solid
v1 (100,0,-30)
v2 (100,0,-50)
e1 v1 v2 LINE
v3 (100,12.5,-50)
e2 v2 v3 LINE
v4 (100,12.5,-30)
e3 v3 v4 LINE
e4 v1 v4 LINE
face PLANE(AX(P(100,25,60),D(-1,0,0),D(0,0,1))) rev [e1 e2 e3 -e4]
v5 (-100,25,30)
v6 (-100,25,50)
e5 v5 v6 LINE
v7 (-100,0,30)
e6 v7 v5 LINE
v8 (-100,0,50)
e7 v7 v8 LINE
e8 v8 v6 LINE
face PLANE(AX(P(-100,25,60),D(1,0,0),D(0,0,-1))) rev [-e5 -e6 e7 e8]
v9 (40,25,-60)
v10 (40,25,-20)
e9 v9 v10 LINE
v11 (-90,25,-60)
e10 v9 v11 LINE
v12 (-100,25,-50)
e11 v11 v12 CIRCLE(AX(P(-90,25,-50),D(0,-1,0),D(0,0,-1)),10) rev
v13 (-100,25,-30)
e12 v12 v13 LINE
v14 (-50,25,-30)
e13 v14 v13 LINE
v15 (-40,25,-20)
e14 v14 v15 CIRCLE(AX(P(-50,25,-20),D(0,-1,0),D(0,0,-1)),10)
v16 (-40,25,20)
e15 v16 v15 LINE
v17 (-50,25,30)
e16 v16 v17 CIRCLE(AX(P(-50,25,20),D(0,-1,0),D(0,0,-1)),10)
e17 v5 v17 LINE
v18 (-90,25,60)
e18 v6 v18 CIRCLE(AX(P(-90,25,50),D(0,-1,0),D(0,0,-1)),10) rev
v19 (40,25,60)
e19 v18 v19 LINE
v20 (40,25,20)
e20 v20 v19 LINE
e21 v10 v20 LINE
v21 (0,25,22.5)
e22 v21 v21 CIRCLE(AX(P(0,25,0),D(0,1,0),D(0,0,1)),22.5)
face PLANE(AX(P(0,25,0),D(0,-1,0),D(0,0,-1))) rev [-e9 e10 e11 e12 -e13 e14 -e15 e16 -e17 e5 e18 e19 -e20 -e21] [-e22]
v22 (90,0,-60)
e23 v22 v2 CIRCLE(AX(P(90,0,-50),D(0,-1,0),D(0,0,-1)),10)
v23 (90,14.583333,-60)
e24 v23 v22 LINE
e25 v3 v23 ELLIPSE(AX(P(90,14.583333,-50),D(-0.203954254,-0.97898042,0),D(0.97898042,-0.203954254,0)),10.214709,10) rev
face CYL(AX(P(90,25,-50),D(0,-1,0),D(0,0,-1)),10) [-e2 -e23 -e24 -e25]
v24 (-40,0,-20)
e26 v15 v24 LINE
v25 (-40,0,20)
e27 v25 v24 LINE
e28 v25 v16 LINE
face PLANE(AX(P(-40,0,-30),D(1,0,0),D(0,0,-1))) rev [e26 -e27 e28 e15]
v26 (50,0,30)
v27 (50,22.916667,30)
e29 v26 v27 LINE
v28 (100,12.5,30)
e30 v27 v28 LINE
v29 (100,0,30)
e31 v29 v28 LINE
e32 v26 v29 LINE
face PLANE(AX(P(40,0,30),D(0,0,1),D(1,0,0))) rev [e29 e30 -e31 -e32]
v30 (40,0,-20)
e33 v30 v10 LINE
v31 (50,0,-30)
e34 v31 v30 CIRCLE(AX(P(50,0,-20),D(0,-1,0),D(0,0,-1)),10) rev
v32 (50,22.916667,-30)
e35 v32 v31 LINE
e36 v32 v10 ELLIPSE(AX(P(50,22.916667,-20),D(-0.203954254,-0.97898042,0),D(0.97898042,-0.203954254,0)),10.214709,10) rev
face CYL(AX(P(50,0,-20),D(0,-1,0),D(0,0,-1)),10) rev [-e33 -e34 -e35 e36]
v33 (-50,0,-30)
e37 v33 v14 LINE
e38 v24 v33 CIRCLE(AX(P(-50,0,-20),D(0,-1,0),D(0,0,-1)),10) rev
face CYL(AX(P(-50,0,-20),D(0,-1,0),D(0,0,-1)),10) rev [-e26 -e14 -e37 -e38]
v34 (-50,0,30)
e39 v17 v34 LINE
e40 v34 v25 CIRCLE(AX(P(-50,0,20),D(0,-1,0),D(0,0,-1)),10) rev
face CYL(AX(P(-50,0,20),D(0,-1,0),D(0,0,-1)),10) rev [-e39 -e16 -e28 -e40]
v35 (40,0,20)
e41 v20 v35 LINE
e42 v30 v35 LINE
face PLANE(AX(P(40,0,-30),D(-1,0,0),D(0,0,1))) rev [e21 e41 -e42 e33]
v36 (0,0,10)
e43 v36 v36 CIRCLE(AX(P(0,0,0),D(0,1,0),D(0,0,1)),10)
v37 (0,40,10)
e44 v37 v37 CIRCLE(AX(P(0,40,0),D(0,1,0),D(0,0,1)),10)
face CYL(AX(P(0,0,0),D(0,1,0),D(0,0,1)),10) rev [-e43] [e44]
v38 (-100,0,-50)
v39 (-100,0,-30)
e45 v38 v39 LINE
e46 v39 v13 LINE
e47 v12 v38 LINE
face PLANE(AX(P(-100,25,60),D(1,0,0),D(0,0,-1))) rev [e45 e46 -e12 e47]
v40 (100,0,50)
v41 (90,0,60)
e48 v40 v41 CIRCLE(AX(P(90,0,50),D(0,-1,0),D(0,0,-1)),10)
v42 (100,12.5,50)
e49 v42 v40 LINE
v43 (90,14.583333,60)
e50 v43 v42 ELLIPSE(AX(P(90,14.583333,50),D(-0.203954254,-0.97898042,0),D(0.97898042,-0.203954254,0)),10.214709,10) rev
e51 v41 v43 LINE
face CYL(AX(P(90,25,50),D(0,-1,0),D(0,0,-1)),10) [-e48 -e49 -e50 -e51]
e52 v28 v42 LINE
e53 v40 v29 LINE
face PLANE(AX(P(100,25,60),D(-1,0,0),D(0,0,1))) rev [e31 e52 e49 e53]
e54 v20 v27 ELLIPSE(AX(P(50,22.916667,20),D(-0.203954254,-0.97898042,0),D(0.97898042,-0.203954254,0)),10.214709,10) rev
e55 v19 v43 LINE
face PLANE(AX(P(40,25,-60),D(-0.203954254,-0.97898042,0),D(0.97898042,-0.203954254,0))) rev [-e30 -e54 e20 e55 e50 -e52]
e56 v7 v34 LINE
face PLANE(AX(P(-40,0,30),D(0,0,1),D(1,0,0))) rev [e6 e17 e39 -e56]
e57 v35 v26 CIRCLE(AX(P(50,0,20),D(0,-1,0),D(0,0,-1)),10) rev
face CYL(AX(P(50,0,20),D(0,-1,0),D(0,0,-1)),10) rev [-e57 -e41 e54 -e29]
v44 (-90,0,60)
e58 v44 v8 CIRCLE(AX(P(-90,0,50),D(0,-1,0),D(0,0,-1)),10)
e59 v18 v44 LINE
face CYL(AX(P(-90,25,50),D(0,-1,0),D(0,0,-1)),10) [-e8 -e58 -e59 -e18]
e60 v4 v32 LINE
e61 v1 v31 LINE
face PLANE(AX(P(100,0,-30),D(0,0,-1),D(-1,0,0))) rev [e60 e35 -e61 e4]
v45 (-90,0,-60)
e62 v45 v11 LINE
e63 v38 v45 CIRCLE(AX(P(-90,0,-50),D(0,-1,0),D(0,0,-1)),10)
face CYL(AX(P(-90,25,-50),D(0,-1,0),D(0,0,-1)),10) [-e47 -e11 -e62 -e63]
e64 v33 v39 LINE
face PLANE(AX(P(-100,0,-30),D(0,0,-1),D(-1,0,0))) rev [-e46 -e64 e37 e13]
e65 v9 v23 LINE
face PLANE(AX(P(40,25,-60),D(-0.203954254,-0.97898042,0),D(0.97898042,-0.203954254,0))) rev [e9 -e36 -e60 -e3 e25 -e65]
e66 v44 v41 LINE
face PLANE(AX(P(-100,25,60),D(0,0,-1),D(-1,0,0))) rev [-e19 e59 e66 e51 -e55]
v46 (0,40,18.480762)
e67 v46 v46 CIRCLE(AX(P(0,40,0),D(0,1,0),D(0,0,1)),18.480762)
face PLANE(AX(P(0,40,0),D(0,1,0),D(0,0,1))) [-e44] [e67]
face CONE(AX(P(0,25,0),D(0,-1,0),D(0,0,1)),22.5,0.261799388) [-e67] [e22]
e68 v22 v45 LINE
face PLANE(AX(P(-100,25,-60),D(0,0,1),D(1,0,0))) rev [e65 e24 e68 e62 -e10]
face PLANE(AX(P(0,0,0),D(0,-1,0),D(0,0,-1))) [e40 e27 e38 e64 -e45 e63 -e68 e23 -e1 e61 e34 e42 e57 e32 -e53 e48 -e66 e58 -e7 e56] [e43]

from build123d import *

# Parameters (mm, degrees)
SKETCH1_W               = 200
SKETCH1_H               = 120
SKETCH1_R               = 22.5
BOSS_EXTRUDE1_DEPTH     = 25
SKETCH1_3_R             = 22.5
BOSS_EXTRUDE2_DEPTH     = 40
SKETCH2_R               = 10
CUT_EXTRUDE1_DEPTH      = 124.288280059
FILLET1_R               = 10
SKETCH3_W               = 60
SKETCH3_H               = 60
CUT_EXTRUDE2_DEPTH      = 120.268604419
FILLET2_R               = 10
CUT_EXTRUDE3_DEPTH      = 124.288280059
CUT_EXTRUDE3_DEPTH_BACK = 124.288280059


# Read off the part's stored shape, not the designer's step: Draft1
with BuildPart() as part:
    # Sketch1 → Boss-Extrude1 (new body)
    with BuildSketch(Plane(origin=(0, 0, 0), x_dir=(1, 0, 0), z_dir=(0, 1, 0))):
        Rectangle(SKETCH1_W, SKETCH1_H)
        with Locations(Location((0, 0, 0), (0, 0, 270))):
            Circle(SKETCH1_R, mode=Mode.SUBTRACT)
    extrude(amount=BOSS_EXTRUDE1_DEPTH)

    # Sketch1<3> → Boss-Extrude2 (add)
    with BuildSketch(Plane(origin=(0, 0, 0), x_dir=(1, 0, 0), z_dir=(0, 1, 0))):
        with Locations(Location((0, 0, 0), (0, 0, 270))):
            Circle(SKETCH1_3_R)
    extrude(amount=BOSS_EXTRUDE2_DEPTH)

    # Draft1 outline → Draft1 (revolve, cut)
    with BuildSketch(Plane.XY):
        Polygon((22.5, 40), (18.480762114, 40), (22.5, 25), align=None)
    revolve(axis=Axis((0, 0, 0), (0, 1, 0)), mode=Mode.SUBTRACT)

    # Sketch2 → Cut-Extrude1 (cut, through all)
    with BuildSketch(Plane(origin=(0, 40, 0), x_dir=(1, 0, 0), z_dir=(0, 1, 0))):
        with Locations(Location((0, 0, 0), (0, 0, 270))):
            Circle(SKETCH2_R)
    extrude(amount=-CUT_EXTRUDE1_DEPTH, mode=Mode.SUBTRACT)

    # Fillet1
    fillet1_edges = [part.edges().sort_by_distance(p)[0] for p in [
        (-100, 12.5, -60),
        (100, 12.5, -60),
        (100, 12.5, 60),
        (-100, 12.5, 60),
    ]]
    fillet(fillet1_edges, radius=FILLET1_R)

    # Sketch3 → Cut-Extrude2 (cut, through all)
    with BuildSketch(Plane(origin=(0, 25, 0), x_dir=(1, 0, 0), z_dir=(0, 1, 0))):
        with Locations((-70, 0)):
            Rectangle(SKETCH3_W, SKETCH3_H)
        with Locations((70, 0)):
            Rectangle(SKETCH3_W, SKETCH3_H)
    extrude(amount=-CUT_EXTRUDE2_DEPTH, mode=Mode.SUBTRACT)

    # Fillet2
    fillet2_edges = [part.edges().sort_by_distance(p)[0] for p in [
        (-40, 12.5, -30),
        (-40, 12.5, 30),
        (40, 12.5, -30),
        (40, 12.5, 30),
    ]]
    fillet(fillet2_edges, radius=FILLET2_R)

    # Sketch4 → Cut-Extrude3 (cut, two sides: drawn at the far end of the back side and taken through both)
    with BuildSketch(Plane.XY.offset(-CUT_EXTRUDE3_DEPTH_BACK)):
        Polygon((40, 25), (100, 12.5), (100, 25), align=None)
    extrude(amount=CUT_EXTRUDE3_DEPTH + CUT_EXTRUDE3_DEPTH_BACK, mode=Mode.SUBTRACT)


solid = part.part
